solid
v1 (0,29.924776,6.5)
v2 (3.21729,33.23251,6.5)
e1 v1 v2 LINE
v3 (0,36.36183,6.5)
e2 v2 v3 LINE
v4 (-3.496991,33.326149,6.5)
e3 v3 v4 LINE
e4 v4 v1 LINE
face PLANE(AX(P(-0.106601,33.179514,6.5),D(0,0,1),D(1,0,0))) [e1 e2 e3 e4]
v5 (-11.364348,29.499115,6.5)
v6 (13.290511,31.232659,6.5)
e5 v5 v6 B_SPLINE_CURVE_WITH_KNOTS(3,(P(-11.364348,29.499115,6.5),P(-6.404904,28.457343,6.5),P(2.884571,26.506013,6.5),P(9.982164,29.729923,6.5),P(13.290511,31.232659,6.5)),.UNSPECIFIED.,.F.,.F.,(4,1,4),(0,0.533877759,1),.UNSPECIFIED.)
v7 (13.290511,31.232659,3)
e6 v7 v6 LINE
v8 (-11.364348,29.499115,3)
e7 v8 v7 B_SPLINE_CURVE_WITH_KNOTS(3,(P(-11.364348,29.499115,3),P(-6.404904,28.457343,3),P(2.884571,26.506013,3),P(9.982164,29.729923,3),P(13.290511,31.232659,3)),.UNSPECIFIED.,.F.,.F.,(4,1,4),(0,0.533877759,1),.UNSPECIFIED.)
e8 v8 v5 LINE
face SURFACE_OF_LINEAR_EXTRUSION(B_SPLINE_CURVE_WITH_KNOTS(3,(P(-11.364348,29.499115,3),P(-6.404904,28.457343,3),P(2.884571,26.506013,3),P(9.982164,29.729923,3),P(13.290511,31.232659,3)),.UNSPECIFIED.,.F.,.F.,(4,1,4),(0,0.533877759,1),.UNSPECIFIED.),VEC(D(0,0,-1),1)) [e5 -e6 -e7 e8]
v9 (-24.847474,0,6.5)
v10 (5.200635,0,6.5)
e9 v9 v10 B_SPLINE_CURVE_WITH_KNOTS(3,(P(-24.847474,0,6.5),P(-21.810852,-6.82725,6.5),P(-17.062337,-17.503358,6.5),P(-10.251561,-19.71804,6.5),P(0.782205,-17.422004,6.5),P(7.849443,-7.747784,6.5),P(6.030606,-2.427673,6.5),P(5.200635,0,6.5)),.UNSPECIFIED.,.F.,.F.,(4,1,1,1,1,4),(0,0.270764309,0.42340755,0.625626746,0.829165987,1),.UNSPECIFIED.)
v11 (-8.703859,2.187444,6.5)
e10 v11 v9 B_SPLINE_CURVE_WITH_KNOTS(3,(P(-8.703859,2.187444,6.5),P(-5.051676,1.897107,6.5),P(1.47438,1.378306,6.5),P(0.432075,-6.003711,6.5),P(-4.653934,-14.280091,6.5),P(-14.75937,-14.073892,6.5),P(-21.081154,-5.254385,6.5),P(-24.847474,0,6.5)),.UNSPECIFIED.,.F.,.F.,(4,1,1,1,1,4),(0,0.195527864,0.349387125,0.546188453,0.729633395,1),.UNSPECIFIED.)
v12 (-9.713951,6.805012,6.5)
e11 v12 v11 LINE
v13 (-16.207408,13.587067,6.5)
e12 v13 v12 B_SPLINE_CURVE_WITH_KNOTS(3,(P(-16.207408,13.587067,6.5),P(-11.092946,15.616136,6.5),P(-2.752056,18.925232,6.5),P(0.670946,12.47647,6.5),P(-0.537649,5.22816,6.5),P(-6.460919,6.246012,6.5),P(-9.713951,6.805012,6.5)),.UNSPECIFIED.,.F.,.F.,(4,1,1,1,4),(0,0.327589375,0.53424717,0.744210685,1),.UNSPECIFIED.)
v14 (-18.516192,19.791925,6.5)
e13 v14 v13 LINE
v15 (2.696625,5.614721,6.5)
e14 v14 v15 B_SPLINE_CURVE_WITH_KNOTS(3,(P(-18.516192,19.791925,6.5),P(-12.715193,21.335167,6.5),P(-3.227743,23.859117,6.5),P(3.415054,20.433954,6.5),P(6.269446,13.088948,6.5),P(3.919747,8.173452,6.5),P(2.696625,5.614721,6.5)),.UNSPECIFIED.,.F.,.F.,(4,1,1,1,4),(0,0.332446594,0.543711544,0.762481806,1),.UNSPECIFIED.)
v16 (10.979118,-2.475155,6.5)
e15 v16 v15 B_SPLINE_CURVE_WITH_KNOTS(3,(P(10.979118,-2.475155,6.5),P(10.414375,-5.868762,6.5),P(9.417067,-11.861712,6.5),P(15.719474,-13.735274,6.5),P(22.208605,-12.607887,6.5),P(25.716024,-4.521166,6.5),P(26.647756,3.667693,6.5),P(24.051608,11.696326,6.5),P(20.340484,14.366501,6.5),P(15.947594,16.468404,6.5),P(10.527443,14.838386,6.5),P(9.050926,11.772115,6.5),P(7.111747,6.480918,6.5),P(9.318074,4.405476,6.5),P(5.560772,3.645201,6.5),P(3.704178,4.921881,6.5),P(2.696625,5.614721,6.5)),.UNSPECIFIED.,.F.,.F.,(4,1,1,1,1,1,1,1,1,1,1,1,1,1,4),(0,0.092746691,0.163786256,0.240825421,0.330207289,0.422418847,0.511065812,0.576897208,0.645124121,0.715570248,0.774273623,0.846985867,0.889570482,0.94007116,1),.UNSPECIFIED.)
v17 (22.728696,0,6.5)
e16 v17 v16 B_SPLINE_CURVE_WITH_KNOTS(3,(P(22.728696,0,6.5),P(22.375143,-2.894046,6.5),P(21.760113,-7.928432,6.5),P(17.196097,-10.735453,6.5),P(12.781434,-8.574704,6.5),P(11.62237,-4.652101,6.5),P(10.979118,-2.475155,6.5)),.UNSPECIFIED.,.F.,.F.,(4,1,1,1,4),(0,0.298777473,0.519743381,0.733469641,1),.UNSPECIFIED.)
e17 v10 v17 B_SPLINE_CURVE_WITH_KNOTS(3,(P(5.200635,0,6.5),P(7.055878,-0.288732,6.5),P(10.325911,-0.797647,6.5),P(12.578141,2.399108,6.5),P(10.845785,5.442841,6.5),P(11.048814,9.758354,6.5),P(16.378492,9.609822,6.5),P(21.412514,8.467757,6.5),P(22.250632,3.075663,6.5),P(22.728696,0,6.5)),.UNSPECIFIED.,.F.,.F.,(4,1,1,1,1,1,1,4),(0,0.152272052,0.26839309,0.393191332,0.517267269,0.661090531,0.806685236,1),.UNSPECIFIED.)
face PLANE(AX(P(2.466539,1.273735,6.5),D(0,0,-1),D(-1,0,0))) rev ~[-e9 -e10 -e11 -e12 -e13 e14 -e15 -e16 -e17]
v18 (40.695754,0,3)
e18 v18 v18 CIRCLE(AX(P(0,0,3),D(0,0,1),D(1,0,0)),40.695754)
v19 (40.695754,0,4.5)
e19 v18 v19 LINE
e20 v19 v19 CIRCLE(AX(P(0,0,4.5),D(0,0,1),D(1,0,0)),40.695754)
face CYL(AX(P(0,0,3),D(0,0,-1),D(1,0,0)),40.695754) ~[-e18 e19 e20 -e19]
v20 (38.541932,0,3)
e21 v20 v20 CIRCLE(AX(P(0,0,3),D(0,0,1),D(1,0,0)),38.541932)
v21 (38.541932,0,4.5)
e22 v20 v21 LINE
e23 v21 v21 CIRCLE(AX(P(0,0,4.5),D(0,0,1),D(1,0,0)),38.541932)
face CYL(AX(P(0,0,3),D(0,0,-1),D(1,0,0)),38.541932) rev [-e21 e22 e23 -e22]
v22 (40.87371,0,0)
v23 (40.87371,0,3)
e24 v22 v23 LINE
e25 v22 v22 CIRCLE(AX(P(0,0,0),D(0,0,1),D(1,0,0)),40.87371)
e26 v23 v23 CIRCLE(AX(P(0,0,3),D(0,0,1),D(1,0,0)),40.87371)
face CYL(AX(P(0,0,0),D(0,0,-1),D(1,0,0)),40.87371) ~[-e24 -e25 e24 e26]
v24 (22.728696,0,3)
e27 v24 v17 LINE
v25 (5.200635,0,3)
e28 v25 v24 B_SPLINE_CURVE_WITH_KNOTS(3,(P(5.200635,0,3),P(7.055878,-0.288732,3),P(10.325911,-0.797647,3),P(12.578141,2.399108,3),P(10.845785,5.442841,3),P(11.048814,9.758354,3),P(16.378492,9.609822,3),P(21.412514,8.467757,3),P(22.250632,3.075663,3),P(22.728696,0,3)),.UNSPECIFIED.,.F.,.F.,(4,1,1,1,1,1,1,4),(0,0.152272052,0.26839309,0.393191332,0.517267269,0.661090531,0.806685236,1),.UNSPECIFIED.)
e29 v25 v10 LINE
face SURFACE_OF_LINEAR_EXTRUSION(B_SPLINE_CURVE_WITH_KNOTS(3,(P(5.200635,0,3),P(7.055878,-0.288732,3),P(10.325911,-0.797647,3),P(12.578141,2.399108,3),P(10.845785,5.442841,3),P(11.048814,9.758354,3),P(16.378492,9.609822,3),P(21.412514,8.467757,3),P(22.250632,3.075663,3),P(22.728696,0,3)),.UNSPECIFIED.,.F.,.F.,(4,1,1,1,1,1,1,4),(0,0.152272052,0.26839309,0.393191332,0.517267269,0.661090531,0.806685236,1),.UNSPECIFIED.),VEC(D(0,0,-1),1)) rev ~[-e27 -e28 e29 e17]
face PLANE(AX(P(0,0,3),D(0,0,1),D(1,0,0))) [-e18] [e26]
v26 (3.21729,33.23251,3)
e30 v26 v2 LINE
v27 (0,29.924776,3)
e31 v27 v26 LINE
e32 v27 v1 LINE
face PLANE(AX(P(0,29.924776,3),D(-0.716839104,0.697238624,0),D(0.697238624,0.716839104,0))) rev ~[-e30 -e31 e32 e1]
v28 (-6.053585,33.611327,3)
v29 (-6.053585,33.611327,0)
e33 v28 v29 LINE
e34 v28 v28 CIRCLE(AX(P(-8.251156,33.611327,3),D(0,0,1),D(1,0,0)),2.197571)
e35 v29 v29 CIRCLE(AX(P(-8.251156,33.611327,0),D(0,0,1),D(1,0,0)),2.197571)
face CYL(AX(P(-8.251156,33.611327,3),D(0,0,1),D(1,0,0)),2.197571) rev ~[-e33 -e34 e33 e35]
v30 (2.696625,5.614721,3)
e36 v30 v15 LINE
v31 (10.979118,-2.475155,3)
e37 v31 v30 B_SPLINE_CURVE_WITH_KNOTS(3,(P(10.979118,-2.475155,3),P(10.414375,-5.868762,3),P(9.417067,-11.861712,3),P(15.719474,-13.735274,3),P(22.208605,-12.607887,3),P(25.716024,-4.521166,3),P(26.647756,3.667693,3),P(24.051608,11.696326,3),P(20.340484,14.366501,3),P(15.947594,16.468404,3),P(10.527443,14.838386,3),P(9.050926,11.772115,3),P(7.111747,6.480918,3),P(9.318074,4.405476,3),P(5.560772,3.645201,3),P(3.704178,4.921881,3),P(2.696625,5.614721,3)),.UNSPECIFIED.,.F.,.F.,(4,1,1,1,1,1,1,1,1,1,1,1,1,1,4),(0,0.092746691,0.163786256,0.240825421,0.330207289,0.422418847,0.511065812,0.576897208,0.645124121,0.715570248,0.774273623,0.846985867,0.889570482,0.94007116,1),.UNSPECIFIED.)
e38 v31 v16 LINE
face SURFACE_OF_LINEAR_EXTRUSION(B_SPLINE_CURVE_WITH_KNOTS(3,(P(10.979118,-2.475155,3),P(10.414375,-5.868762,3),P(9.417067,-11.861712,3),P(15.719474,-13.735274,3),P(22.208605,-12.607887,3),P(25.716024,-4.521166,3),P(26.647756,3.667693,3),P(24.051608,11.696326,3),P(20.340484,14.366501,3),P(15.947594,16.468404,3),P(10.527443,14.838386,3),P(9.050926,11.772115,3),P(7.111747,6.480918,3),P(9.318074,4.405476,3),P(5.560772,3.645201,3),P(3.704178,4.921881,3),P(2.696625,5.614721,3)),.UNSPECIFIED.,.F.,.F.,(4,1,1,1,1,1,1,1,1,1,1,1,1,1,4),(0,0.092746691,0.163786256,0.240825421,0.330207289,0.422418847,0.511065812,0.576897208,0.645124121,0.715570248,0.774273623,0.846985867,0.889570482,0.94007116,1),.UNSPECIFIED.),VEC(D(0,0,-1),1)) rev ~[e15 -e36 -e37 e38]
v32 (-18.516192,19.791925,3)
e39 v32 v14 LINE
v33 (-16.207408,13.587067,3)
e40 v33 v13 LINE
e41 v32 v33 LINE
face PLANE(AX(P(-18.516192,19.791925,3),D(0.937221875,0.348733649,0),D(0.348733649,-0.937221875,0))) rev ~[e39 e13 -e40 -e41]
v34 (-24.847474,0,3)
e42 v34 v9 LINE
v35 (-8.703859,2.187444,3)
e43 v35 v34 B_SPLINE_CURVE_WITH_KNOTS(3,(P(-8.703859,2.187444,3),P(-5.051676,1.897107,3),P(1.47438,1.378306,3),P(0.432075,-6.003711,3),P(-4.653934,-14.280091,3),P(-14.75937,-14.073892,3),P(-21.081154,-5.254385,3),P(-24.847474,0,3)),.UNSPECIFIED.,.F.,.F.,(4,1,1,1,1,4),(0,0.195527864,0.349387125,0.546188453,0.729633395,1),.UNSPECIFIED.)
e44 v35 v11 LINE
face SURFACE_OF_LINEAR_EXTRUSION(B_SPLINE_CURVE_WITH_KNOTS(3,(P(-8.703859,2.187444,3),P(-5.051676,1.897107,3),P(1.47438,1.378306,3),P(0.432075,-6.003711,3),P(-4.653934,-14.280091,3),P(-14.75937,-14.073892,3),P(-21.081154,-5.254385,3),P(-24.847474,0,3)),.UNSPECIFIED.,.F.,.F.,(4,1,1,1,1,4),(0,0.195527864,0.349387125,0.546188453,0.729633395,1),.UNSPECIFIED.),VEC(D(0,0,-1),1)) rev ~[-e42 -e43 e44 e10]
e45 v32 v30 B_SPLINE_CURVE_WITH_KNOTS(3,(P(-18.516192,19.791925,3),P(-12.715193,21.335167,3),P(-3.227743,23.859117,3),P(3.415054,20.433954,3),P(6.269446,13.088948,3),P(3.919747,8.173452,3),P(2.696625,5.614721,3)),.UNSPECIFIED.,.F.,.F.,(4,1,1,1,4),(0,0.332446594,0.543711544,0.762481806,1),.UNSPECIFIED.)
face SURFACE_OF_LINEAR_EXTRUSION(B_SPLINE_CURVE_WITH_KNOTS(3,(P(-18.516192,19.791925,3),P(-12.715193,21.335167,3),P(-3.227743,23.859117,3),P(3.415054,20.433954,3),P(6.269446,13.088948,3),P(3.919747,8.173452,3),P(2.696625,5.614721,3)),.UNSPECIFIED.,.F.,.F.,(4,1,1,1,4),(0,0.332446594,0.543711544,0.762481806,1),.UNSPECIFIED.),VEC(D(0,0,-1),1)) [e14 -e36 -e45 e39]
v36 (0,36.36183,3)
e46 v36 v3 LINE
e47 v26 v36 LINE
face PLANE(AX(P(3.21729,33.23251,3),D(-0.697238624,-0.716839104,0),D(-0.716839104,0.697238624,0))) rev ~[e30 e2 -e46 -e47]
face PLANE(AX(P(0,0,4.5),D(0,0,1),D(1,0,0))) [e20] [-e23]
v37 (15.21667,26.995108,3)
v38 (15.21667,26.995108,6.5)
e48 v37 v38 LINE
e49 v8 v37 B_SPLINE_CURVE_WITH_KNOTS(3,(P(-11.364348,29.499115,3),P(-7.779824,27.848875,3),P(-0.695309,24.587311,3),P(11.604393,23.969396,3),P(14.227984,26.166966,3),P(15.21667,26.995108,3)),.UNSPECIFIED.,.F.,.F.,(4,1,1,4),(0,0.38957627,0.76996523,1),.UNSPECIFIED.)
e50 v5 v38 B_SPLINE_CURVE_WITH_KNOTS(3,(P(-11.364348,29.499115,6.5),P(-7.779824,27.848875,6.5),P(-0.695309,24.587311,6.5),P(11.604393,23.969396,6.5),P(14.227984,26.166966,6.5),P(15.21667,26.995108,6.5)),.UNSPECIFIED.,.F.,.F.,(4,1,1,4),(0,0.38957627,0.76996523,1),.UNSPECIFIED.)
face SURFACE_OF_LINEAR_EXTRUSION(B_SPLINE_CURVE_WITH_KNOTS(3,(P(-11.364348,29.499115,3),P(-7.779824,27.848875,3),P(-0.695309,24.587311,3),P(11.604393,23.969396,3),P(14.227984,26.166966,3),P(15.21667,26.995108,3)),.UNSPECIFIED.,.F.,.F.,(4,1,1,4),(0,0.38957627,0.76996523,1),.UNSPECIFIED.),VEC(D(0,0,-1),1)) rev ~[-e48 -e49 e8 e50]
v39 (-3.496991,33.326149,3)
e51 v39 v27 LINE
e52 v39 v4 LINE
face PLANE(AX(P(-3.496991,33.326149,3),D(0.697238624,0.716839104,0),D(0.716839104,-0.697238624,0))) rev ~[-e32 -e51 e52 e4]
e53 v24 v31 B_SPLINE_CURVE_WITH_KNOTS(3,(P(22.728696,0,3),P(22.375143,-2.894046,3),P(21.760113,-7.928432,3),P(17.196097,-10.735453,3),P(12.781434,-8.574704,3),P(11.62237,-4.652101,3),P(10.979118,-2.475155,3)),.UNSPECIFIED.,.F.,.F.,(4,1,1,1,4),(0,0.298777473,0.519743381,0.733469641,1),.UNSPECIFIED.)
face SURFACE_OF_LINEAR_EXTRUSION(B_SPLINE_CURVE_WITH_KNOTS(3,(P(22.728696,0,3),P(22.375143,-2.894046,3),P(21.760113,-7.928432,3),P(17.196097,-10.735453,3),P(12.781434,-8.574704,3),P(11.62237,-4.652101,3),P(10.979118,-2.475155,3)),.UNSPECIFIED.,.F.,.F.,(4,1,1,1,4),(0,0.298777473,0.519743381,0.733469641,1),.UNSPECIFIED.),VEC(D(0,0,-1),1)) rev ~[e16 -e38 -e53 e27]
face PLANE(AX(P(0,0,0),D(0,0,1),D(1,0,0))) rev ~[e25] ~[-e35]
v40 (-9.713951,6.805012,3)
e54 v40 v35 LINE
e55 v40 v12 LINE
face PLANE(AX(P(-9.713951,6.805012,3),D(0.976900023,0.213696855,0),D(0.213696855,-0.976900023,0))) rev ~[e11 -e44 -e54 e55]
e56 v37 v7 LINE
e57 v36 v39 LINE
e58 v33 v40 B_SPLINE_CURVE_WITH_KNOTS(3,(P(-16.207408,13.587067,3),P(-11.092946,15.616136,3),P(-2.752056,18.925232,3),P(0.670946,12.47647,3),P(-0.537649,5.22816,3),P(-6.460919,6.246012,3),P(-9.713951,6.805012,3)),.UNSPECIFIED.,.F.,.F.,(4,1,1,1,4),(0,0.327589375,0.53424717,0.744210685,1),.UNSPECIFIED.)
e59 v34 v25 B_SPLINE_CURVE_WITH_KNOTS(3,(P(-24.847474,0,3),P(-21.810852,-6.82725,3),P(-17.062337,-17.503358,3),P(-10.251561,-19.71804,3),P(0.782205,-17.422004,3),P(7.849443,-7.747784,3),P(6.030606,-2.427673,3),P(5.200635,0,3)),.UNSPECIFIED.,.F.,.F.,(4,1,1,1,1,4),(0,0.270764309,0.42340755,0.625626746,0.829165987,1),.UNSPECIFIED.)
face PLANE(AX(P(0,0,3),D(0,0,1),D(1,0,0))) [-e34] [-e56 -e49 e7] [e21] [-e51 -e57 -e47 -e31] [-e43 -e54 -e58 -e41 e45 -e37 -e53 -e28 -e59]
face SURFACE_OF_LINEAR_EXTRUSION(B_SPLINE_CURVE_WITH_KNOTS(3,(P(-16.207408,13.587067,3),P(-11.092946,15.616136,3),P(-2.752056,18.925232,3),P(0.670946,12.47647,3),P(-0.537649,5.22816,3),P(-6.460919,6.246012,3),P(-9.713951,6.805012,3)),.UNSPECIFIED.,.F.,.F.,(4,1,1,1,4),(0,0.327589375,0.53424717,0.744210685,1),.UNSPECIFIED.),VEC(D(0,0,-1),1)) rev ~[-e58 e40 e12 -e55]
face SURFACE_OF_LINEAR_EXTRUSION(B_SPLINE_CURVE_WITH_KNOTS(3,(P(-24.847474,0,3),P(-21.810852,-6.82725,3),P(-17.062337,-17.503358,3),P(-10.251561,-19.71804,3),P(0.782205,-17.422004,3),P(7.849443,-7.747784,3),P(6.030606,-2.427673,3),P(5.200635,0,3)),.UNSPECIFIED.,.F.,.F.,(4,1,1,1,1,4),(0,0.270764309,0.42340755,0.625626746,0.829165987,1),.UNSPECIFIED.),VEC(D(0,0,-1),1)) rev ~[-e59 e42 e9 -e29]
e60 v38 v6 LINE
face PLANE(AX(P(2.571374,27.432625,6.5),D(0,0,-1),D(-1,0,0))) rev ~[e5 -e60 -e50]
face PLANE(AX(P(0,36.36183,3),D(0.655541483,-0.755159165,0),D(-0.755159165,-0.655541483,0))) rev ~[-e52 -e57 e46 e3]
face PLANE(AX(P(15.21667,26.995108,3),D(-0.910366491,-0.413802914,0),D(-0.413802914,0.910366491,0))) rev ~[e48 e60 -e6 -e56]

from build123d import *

# Parameters (mm, degrees)
F0_R     = 40.8737100338
F1_DEPTH = 3
F2_R     = 40.6957539797
F2_R_2   = 38.5419315624
F3_DEPTH = 1.5
F5_DEPTH = 3.5
F6_R     = 2.1975710884
F7_DEPTH = 3


with BuildPart() as f1:
    # F0 (on Top) → F1 (new body)
    with BuildSketch(Plane.XY):
        Circle(F0_R)
    extrude(amount=F1_DEPTH)

    # F2 (on face) → F3 (join)
    with BuildSketch(Plane.XY.offset(3)):
        Circle(F2_R)
        Circle(F2_R_2, mode=Mode.SUBTRACT)
    extrude(amount=F3_DEPTH)

    # F4 (on face) → F5 (join)
    with BuildSketch(Plane.XY.offset(3)):
        with BuildLine():
            add(Edge.make_bspline(
                [(-18.5161922127, 19.791925326), (-12.7151925876, 21.3351674452), (-3.2277425118, 23.859117369), (3.4150540296, 20.4339539585), (6.2694455573, 13.0889481493), (3.9197467048, 8.1734523404), (2.6966251899, 5.6147207506)],
                knots=[0, 0, 0, 0, 0.332446594, 0.5437115441, 0.7624818062, 1, 1, 1, 1], degree=3))
            Line((-18.5161922127, 19.791925326), (-16.20740816, 13.5870669037))
            add(Edge.make_bspline(
                [(-16.20740816, 13.5870669037), (-11.0929458702, 15.6161362843), (-2.752055686, 18.9252319275), (0.6709459709, 12.4764702332), (-0.5376493129, 5.2281596847), (-6.4609189943, 6.24601212), (-9.7139514983, 6.8050120026)],
                knots=[0, 0, 0, 0, 0.3275893752, 0.5342471699, 0.7442106849, 1, 1, 1, 1], degree=3))
            Line((-9.7139514983, 6.8050120026), (-8.7038585916, 2.1874438971))
            add(Edge.make_bspline(
                [(-8.7038585916, 2.1874438971), (-5.0516756353, 1.8971066874), (1.4743799313, 1.3783055249), (0.4320748866, -6.0037109711), (-4.6539335606, -14.2800911607), (-14.7593699815, -14.073892468), (-21.0811542832, -5.254384585), (-24.8474739492, 0)],
                knots=[0, 0, 0, 0, 0.1955278639, 0.3493871254, 0.5461884526, 0.7296333955, 1, 1, 1, 1], degree=3))
            add(Edge.make_bspline(
                [(-24.8474739492, 0), (-21.8108523669, -6.8272496265), (-17.0623369266, -17.5033577248), (-10.2515605655, -19.7180403086), (0.7822052269, -17.4220041674), (7.8494428689, -7.7477839242), (6.0306062721, -2.4276731034), (5.2006347105, 0)],
                knots=[0, 0, 0, 0, 0.2707643094, 0.4234075499, 0.6256267457, 0.8291659872, 1, 1, 1, 1], degree=3))
            add(Edge.make_bspline(
                [(5.2006347105, 0), (7.0558782543, -0.288731548), (10.3259106837, -0.7976466868), (12.5781414282, 2.3991075178), (10.8457845725, 5.4428405295), (11.0488135588, 9.7583543287), (16.3784916805, 9.6098216805), (21.4125144717, 8.4677573473), (22.2506321534, 3.0756632517), (22.7286964655, 0)],
                knots=[0, 0, 0, 0, 0.1522720518, 0.2683930901, 0.393191332, 0.517267269, 0.6610905311, 0.8066852357, 1, 1, 1, 1], degree=3))
            add(Edge.make_bspline(
                [(22.7286964655, 0), (22.3751428346, -2.8940459342), (21.760112666, -7.9284322424), (17.1960973157, -10.7354530989), (12.7814342968, -8.5747040819), (11.6223696105, -4.6521009952), (10.9791178256, -2.475154819)],
                knots=[0, 0, 0, 0, 0.2987774731, 0.5197433814, 0.7334696409, 1, 1, 1, 1], degree=3))
            add(Edge.make_bspline(
                [(10.9791178256, -2.475154819), (10.4143752119, -5.868762178), (9.4170665506, -11.8617117622), (15.7194742185, -13.7352738113), (22.208604559, -12.607886853), (25.7160244182, -4.5211657639), (26.6477559678, 3.6676927283), (24.0516080161, 11.6963261383), (20.3404842083, 14.366500869), (15.9475940403, 16.4684038367), (10.5274427232, 14.8383861124), (9.0509264503, 11.7721150129), (7.1117466969, 6.480918156), (9.3180739858, 4.40547596), (5.5607718644, 3.6452011728), (3.704177681, 4.9218811085), (2.6966251899, 5.6147207506)],
                knots=[0, 0, 0, 0, 0.0927466913, 0.1637862563, 0.2408254215, 0.3302072886, 0.4224188469, 0.511065812, 0.5768972077, 0.6451241214, 0.7155702479, 0.7742736226, 0.8469858668, 0.8895704824, 0.9400711601, 1, 1, 1, 1], degree=3))
        make_face()
        with BuildLine():
            add(Edge.make_bspline(
                [(-11.3643482327, 29.4991154224), (-6.404904251, 28.4573434012), (2.8845705426, 26.5060127748), (9.9821642335, 29.7299226682), (13.2905105129, 31.2326587737)],
                knots=[0, 0, 0, 0, 0.5338777586, 1, 1, 1, 1], degree=3))
            add(Edge.make_bspline(
                [(-11.3643482327, 29.4991154224), (-7.7798241077, 27.8488746747), (-0.6953090811, 24.5873105264), (11.6043928769, 23.9693963536), (14.2279842551, 26.1669657789), (15.2166699991, 26.9951075315)],
                knots=[0, 0, 0, 0, 0.3895762705, 0.76996523, 1, 1, 1, 1], degree=3))
            Line((15.2166699991, 26.9951075315), (13.2905105129, 31.2326587737))
        make_face()
        Polygon((0, 36.3618300318), (-3.4969905391, 33.3261489868), (0, 29.9247764051), (3.2172903236, 33.232509843), align=None)
    extrude(amount=F5_DEPTH)

    # F6 (on face) → F7 (cut)
    with BuildSketch(Plane.XY.offset(3)):
        with Locations((-8.2511557266, 33.6113274097)):
            Circle(F6_R)
    extrude(amount=-F7_DEPTH, mode=Mode.SUBTRACT)


solid = f1.part
